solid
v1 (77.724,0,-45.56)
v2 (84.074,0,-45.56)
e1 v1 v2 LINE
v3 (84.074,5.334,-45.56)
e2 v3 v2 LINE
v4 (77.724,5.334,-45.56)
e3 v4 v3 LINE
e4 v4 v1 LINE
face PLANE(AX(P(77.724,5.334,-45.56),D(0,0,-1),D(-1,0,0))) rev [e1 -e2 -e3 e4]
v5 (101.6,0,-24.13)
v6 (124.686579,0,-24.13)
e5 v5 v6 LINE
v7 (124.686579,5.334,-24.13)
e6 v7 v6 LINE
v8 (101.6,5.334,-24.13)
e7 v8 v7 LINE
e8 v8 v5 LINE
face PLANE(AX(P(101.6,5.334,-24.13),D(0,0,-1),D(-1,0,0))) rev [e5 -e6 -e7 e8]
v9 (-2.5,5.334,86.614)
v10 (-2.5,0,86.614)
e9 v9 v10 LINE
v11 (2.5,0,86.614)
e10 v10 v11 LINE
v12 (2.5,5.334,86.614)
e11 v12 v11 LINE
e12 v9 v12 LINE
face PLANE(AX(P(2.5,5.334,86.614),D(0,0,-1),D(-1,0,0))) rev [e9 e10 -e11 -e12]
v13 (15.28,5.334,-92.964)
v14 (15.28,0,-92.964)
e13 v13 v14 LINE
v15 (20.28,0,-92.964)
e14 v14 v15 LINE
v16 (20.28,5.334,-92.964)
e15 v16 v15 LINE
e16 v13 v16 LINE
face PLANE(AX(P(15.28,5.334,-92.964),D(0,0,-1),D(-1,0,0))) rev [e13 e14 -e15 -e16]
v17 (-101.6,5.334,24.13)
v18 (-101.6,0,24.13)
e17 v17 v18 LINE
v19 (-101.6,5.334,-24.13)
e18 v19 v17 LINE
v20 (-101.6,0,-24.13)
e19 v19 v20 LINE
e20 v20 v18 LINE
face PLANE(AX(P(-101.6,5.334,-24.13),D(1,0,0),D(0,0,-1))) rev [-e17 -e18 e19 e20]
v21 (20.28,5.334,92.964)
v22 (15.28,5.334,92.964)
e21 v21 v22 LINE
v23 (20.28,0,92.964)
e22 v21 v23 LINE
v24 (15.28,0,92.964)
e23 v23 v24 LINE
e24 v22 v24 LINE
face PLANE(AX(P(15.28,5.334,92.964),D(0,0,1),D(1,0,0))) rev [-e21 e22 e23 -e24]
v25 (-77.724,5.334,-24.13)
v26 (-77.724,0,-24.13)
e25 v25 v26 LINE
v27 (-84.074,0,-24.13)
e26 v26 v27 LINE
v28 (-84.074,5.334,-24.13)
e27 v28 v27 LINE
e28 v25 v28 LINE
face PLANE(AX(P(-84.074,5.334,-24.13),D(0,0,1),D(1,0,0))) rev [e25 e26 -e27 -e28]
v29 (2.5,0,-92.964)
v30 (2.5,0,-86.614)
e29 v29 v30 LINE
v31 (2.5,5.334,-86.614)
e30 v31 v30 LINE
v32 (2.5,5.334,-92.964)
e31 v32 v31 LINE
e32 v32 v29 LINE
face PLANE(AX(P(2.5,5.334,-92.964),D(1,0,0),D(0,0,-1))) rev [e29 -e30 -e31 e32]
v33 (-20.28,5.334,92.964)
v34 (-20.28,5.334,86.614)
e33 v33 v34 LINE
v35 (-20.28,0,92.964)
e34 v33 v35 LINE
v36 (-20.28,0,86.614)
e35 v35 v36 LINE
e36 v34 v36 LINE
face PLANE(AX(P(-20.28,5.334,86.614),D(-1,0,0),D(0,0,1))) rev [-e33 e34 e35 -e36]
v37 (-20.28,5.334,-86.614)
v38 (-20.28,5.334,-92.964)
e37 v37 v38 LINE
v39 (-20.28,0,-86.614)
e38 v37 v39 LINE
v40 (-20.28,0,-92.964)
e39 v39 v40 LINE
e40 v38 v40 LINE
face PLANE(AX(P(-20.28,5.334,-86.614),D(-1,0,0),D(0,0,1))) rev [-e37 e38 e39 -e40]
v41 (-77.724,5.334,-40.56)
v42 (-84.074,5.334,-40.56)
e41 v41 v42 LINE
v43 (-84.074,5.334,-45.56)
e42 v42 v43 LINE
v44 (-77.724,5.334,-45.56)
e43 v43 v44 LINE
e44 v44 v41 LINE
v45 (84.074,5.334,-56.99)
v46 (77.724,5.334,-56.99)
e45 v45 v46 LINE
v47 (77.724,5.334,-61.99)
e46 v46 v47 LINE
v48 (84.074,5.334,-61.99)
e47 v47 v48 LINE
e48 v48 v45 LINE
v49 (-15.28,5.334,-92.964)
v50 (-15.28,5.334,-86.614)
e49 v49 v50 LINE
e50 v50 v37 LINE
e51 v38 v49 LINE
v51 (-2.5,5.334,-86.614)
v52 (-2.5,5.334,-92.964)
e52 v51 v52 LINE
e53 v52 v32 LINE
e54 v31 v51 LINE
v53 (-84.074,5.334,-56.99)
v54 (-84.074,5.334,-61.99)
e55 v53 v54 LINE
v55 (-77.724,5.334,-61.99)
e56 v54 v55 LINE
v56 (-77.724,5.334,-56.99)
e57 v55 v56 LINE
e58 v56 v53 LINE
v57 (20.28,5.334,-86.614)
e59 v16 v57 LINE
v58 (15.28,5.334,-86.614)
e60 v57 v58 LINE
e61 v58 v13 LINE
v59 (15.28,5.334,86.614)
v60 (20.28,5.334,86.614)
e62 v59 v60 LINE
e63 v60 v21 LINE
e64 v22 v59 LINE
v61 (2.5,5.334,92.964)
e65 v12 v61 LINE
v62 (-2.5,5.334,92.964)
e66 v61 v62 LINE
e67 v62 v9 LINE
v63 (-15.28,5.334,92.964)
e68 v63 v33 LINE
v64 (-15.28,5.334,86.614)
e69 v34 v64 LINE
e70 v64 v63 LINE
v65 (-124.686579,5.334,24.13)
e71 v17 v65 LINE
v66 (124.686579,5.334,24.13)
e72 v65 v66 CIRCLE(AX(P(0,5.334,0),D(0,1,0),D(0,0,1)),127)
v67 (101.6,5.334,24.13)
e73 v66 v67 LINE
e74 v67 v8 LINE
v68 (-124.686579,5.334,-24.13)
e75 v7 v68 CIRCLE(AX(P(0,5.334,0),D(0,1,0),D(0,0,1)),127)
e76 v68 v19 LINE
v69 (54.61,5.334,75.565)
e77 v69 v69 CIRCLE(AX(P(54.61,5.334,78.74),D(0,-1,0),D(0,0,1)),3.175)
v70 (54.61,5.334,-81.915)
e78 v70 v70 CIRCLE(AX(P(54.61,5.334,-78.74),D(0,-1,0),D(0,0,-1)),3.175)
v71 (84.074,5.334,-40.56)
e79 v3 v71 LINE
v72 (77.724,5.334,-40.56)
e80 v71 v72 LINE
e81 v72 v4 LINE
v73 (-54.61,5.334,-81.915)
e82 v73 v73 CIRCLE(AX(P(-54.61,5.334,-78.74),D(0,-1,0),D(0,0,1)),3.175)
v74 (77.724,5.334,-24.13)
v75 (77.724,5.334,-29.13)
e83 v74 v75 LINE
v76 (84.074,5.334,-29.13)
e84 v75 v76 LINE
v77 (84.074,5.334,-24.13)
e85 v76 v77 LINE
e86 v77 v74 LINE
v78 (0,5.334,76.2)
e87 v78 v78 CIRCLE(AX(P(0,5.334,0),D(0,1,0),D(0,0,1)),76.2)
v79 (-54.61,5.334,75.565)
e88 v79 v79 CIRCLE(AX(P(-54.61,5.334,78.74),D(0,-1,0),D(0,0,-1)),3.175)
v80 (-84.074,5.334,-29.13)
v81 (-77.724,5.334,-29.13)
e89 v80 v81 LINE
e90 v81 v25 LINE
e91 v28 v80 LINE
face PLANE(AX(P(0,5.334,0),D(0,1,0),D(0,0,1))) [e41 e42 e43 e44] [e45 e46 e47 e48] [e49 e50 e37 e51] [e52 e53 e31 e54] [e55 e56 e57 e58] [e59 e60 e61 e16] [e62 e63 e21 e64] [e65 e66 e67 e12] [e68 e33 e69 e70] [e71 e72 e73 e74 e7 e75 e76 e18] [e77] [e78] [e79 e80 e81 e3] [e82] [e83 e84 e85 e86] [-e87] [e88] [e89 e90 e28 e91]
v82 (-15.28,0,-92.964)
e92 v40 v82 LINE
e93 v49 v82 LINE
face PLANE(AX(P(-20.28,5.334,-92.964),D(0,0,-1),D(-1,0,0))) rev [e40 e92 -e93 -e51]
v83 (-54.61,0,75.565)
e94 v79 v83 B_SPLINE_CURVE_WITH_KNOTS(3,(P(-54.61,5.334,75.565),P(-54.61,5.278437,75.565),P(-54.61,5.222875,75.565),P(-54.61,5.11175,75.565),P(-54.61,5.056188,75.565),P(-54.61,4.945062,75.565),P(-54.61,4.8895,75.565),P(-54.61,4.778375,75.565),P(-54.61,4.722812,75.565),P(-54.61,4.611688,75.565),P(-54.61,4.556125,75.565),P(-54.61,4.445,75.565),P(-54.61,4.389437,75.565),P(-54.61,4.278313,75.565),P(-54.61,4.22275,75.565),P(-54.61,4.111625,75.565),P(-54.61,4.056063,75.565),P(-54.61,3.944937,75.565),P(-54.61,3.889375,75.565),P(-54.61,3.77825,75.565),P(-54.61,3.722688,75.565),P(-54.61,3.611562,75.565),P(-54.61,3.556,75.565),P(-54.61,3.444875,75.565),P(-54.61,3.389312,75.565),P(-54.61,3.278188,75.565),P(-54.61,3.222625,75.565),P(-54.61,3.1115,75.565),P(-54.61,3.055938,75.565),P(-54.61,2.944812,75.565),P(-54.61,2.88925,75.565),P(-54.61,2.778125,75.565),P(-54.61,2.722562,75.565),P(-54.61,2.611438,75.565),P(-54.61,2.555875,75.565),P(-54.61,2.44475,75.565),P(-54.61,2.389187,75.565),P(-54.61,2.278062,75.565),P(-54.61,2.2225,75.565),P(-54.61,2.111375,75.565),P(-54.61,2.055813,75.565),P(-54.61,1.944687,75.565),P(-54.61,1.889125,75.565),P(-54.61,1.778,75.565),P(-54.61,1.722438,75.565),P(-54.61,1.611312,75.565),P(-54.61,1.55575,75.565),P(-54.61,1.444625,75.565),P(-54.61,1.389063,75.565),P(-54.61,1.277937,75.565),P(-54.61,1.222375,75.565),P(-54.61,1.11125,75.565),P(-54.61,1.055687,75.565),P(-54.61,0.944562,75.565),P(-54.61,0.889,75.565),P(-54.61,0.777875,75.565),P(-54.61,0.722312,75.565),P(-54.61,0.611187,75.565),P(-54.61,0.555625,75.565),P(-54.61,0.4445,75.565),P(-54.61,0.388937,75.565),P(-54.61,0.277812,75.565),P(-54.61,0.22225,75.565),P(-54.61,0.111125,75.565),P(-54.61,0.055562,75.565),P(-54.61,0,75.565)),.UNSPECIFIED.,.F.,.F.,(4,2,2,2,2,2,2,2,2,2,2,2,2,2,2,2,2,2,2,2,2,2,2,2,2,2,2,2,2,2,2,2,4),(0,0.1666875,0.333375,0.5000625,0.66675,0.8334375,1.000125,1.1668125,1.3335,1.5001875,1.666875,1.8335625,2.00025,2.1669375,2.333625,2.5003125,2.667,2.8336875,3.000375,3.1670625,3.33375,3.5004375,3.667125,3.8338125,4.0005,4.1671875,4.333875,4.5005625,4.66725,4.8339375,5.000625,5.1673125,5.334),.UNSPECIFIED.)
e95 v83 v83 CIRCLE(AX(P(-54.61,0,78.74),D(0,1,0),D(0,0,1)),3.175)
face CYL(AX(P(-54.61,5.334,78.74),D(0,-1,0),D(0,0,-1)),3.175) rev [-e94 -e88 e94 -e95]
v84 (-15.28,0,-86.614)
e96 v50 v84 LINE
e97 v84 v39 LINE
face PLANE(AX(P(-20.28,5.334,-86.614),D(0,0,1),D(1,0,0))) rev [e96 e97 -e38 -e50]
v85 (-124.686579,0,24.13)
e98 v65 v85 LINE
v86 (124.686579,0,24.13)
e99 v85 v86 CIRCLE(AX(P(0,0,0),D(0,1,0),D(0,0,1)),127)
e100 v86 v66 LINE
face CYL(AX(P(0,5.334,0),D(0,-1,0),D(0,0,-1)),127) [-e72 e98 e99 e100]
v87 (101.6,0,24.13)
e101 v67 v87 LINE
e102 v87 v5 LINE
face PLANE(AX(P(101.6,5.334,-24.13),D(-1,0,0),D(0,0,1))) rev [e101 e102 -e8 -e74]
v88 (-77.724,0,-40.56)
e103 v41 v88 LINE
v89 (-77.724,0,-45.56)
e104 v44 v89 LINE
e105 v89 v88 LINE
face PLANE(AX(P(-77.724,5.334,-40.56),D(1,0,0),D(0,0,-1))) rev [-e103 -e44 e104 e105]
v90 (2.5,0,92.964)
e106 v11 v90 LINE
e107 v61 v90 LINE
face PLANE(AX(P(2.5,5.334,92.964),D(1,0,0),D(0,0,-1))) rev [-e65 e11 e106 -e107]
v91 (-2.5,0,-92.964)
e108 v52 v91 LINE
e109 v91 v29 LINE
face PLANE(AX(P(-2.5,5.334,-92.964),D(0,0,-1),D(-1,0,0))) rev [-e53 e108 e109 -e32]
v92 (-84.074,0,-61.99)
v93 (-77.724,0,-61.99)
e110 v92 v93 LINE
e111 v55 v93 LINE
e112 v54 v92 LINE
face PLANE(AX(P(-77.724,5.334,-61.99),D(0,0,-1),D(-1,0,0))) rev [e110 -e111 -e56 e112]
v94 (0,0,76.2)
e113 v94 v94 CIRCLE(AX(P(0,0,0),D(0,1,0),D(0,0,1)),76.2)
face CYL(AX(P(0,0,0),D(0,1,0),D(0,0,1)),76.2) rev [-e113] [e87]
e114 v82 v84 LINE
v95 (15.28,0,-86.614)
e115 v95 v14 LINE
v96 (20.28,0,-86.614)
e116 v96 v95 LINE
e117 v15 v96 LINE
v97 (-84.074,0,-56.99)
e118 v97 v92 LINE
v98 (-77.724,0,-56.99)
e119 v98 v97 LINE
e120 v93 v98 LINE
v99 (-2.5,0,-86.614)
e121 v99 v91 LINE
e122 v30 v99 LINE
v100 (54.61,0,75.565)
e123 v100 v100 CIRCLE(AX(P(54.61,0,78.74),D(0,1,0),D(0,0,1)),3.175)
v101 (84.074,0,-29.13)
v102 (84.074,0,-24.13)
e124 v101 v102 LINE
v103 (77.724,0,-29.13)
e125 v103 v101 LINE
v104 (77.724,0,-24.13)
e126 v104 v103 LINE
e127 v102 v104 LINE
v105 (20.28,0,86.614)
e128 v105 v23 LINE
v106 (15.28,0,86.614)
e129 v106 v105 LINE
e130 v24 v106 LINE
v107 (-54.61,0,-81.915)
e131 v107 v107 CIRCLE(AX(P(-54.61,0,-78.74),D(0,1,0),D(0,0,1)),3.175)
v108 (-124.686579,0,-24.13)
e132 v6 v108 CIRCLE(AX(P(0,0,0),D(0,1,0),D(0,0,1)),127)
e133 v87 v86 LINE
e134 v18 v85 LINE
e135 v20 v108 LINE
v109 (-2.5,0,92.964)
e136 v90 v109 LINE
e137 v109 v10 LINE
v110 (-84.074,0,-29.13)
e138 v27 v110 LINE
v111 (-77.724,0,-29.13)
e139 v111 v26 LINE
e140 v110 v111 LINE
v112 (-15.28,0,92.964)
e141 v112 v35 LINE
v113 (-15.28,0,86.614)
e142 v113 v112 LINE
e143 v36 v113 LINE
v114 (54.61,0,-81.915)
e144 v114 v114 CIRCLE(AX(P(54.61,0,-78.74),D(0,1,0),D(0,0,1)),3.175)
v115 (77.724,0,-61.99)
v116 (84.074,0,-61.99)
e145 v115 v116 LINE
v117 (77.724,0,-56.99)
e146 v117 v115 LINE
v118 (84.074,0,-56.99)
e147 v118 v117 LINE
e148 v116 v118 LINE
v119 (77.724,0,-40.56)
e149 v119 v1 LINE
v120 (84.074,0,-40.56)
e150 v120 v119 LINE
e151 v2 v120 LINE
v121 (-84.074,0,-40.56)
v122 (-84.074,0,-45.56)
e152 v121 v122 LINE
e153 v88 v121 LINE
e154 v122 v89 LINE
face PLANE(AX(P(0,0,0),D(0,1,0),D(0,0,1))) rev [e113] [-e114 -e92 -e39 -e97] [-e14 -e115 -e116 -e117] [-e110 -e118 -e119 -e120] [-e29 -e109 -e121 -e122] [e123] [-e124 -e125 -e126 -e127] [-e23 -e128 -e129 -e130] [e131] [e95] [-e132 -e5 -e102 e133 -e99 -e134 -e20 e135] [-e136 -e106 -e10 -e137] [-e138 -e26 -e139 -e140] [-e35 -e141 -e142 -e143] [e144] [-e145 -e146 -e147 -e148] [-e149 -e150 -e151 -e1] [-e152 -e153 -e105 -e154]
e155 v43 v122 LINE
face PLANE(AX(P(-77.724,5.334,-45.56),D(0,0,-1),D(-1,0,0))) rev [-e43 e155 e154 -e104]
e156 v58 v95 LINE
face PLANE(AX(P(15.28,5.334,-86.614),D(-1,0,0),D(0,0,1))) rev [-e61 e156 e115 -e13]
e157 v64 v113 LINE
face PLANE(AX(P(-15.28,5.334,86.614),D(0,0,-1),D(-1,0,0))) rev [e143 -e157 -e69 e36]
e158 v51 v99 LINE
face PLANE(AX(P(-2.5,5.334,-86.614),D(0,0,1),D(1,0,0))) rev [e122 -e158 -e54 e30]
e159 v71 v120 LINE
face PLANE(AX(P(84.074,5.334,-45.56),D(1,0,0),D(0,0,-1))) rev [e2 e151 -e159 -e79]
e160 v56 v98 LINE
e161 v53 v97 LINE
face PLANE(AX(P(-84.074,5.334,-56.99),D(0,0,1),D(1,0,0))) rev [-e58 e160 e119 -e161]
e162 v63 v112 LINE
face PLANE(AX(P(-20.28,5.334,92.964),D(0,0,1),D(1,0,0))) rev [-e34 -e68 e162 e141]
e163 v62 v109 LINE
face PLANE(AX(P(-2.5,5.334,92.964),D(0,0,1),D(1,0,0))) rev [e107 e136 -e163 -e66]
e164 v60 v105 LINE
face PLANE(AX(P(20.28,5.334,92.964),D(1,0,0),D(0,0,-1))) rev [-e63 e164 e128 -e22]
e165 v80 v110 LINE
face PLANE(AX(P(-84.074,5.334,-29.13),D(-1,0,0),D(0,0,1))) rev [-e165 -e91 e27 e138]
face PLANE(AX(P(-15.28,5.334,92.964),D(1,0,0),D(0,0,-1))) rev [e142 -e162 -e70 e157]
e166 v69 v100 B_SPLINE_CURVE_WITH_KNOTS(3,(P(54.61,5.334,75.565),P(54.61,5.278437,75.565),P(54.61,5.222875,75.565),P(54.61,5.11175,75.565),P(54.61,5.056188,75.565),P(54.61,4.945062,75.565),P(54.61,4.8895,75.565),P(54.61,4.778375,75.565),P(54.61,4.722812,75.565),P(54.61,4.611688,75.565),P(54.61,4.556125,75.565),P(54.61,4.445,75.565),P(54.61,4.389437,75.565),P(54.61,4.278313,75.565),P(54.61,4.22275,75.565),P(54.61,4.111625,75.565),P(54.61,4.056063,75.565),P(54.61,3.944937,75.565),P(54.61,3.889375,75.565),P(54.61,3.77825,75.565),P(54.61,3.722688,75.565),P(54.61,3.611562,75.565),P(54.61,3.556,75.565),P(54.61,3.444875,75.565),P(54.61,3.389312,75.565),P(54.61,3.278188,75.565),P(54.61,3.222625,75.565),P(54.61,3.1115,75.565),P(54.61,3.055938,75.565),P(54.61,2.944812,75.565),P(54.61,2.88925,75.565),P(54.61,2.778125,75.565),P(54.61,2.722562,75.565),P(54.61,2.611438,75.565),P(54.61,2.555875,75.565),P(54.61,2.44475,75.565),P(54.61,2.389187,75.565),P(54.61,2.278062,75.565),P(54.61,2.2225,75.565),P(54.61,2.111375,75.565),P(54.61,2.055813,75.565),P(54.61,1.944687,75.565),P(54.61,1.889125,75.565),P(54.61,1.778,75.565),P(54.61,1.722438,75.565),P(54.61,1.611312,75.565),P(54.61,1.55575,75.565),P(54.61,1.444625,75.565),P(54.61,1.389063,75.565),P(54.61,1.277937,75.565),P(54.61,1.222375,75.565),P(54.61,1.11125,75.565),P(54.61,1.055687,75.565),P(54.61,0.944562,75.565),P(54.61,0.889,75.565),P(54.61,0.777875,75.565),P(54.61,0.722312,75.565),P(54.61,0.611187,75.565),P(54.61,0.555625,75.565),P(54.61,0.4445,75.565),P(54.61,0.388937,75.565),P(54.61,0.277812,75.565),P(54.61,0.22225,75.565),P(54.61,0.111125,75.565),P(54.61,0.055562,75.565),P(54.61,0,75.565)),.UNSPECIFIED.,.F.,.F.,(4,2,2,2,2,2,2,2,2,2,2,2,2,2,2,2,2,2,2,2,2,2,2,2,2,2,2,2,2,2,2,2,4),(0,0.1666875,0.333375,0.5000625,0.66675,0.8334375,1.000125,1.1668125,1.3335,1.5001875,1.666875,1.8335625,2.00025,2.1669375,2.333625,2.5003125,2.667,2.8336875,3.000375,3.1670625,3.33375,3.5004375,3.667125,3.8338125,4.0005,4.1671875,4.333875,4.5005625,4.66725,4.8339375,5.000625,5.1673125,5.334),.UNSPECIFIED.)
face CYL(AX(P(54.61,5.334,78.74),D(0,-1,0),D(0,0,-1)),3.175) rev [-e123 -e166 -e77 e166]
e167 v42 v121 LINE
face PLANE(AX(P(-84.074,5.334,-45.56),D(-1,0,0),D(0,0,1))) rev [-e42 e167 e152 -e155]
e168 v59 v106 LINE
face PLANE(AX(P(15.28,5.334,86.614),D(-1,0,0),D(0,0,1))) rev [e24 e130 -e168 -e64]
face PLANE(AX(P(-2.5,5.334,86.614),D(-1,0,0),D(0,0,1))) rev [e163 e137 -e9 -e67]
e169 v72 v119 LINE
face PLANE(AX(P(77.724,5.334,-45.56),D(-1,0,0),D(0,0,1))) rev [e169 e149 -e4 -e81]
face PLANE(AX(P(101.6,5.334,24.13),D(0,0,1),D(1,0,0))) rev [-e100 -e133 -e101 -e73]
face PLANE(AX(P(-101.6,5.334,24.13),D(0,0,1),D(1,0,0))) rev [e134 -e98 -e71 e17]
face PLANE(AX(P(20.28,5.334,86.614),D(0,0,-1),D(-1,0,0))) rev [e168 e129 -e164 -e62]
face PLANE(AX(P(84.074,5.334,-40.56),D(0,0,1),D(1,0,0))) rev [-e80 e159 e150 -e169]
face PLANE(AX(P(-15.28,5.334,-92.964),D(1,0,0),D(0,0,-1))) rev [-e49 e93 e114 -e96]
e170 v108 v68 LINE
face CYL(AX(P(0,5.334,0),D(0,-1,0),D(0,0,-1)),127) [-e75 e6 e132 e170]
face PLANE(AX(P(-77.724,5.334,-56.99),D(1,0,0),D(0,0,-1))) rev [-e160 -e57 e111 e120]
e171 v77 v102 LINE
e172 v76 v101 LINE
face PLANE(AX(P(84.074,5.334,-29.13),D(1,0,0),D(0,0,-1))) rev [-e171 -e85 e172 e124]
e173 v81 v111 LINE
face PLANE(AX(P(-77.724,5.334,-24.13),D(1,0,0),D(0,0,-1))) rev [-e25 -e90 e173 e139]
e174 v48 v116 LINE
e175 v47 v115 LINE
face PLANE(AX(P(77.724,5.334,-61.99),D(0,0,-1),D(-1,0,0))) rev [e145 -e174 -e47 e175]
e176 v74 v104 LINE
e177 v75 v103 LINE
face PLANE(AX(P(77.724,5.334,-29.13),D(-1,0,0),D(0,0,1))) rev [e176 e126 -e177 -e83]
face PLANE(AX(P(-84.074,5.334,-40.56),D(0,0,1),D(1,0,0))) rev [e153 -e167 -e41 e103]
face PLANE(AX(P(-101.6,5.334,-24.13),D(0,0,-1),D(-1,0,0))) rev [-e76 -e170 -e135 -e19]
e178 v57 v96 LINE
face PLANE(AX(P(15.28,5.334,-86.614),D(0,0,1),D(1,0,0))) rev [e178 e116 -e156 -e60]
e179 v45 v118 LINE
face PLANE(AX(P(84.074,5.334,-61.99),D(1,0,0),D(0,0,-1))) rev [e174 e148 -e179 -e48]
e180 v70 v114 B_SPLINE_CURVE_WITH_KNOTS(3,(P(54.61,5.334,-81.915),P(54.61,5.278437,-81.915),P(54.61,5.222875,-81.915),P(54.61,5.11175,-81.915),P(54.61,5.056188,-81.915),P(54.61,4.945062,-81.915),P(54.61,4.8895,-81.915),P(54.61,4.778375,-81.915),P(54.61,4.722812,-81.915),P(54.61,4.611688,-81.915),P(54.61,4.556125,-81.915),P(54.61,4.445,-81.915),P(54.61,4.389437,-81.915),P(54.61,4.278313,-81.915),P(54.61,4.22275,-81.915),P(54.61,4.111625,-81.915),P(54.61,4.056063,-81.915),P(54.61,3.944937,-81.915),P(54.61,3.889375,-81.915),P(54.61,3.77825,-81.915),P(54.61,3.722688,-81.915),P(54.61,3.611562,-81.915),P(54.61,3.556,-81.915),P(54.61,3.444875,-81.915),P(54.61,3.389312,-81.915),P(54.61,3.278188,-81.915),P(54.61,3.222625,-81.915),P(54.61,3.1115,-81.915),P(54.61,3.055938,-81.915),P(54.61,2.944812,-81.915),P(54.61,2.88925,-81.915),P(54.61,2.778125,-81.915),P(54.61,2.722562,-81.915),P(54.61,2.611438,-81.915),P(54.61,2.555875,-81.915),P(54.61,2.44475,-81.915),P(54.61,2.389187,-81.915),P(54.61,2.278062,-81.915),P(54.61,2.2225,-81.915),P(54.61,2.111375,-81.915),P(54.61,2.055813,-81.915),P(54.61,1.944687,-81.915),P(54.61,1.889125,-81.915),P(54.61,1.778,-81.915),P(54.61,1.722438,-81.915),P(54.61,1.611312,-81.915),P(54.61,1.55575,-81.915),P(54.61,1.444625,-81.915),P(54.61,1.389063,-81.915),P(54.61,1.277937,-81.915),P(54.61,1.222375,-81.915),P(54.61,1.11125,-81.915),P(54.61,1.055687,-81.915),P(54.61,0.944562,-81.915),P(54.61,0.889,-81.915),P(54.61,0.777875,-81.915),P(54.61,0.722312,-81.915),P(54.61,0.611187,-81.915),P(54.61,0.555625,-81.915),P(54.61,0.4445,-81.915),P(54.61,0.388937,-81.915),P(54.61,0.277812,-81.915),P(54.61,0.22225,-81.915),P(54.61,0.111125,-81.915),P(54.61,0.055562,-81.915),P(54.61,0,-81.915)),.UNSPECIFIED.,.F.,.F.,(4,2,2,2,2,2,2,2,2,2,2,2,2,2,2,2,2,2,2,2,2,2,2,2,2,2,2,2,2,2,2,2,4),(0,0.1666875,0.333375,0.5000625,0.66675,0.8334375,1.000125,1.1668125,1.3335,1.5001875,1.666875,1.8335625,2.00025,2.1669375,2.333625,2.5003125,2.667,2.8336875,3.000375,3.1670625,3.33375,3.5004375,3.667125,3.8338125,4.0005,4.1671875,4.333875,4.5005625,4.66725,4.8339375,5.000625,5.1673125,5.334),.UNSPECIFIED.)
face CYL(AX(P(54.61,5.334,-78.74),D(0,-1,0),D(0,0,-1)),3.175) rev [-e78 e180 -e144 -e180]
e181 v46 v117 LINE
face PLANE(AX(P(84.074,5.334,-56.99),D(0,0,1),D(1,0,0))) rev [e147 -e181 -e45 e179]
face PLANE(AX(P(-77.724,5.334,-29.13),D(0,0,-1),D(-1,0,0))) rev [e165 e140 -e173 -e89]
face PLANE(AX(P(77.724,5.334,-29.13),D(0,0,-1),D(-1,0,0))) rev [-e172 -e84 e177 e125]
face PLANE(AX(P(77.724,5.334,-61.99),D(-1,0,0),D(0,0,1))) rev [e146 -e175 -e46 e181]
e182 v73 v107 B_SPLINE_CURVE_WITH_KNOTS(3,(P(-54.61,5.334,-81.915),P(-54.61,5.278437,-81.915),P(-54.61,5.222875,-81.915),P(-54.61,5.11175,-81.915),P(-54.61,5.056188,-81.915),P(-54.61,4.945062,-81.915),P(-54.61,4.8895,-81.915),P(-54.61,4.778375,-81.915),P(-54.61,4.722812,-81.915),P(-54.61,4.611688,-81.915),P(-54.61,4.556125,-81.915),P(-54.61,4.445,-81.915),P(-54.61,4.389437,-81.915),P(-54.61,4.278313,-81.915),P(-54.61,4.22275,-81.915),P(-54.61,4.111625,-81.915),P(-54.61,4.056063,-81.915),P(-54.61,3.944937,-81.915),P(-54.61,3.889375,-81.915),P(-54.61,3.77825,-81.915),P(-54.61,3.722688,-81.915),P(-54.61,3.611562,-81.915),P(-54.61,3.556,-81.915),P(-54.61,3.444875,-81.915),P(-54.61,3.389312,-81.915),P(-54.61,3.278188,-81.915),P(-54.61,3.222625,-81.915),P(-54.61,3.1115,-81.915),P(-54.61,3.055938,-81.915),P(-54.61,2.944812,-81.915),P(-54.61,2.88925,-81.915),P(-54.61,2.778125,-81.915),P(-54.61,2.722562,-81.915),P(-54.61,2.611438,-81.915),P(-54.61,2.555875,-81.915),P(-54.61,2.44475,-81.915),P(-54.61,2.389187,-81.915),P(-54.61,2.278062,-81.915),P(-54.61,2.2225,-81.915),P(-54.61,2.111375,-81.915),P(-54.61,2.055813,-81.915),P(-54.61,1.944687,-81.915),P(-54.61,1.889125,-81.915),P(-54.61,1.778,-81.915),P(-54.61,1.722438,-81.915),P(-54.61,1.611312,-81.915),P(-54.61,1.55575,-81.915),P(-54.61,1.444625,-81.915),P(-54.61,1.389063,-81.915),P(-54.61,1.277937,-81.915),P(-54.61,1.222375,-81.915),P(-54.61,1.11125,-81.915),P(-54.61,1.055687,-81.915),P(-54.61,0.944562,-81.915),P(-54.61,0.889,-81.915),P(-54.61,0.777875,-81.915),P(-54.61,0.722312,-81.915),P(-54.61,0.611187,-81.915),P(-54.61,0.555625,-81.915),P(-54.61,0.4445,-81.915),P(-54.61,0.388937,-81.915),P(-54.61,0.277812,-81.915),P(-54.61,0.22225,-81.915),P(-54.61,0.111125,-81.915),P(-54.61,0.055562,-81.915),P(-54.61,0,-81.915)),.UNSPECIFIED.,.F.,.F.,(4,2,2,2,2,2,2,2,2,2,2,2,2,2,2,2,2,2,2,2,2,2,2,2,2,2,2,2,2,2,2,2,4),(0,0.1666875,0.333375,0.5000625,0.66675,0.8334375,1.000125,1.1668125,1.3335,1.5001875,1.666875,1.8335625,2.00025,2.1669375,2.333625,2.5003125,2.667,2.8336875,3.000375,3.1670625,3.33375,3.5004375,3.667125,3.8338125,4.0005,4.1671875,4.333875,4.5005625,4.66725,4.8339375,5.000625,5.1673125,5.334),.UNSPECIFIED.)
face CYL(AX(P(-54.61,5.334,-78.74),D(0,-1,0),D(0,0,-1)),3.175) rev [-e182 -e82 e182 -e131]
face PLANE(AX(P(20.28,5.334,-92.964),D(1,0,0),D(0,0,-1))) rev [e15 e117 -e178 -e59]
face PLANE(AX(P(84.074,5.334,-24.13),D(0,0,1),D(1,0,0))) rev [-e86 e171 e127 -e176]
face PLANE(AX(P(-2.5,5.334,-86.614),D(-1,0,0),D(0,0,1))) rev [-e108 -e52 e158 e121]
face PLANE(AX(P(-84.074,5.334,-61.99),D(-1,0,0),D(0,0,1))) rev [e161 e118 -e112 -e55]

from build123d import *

# Parameters (mm, degrees)
SKETCH1_R          = 127
BASE_DEPTH         = 5.334
SKETCH2_R          = 76.2
CENTER_CUT_DEPTH   = 180.684310823
SKETCH14_W         = 5
SKETCH14_H         = 6.35
SKETCH14_W_2       = 6.35
SKETCH14_H_2       = 5
CUT_EXTRUDE1_DEPTH = 180.684310823
SKETCH15_W         = 30.48
SKETCH15_H         = 48.26
CUT_EXTRUDE2_DEPTH = 180.684310823
HOLE1_OUTLINE_R    = 3.175
HOLE1_DEPTH        = 5.334


# Read off the part's stored shape, not the designer's step: Hole1
with BuildPart() as part:
    # Sketch1 → Base (new body)
    with BuildSketch(Plane(origin=(0, 0, 0), x_dir=(1, 0, 0), z_dir=(0, 1, 0))):
        with Locations(Location((0, 0, 0), (0, 0, 270))):
            Circle(SKETCH1_R)
    extrude(amount=BASE_DEPTH)

    # Sketch2 → Center Cut (cut, through all)
    with BuildSketch(Plane(origin=(0, 5.334, 0), x_dir=(1, 0, 0), z_dir=(0, 1, 0))):
        with Locations(Location((0, 0, 0), (0, 0, 270))):
            Circle(SKETCH2_R)
    extrude(amount=-CENTER_CUT_DEPTH, mode=Mode.SUBTRACT)

    # Sketch14 → Cut-Extrude1 (cut, through all)
    with BuildSketch(Plane.XZ):
        with Locations((0, 89.789)):
            Rectangle(SKETCH14_W, SKETCH14_H)
        with Locations((-17.78, 89.789)):
            Rectangle(SKETCH14_W, SKETCH14_H)
        with Locations((17.78, 89.789)):
            Rectangle(SKETCH14_W, SKETCH14_H)
        with Locations((-80.899, -26.63)):
            Rectangle(SKETCH14_W_2, SKETCH14_H_2)
        with Locations((-80.899, -43.06)):
            Rectangle(SKETCH14_W_2, SKETCH14_H_2)
        with Locations((-80.899, -59.49)):
            Rectangle(SKETCH14_W_2, SKETCH14_H_2)
        with Locations((80.899, -26.63)):
            Rectangle(SKETCH14_W_2, SKETCH14_H_2)
        with Locations((80.899, -43.06)):
            Rectangle(SKETCH14_W_2, SKETCH14_H_2)
        with Locations((80.899, -59.49)):
            Rectangle(SKETCH14_W_2, SKETCH14_H_2)
        with Locations((17.78, -89.789)):
            Rectangle(SKETCH14_W, SKETCH14_H)
        with Locations((0, -89.789)):
            Rectangle(SKETCH14_W, SKETCH14_H)
        with Locations((-17.78, -89.789)):
            Rectangle(SKETCH14_W, SKETCH14_H)
    extrude(amount=-CUT_EXTRUDE1_DEPTH, mode=Mode.SUBTRACT)

    # Sketch15 → Cut-Extrude2 (cut, through all)
    with BuildSketch(Plane.XZ):
        with Locations((-116.84, 0)):
            Rectangle(SKETCH15_W, SKETCH15_H)
        with Locations((116.84, 0)):
            Rectangle(SKETCH15_W, SKETCH15_H)
    extrude(amount=-CUT_EXTRUDE2_DEPTH, mode=Mode.SUBTRACT)

    # Hole1 outline → Hole1 (cut)
    with BuildSketch(Plane(origin=(0, 0, 0), x_dir=(1, 0, 0), z_dir=(0, 1, 0))):
        with Locations((-54.61, -78.74)):
            Circle(HOLE1_OUTLINE_R)
        with Locations((54.61, -78.74)):
            Circle(HOLE1_OUTLINE_R)
        with Locations((54.61, 78.74)):
            Circle(HOLE1_OUTLINE_R)
        with Locations((-54.61, 78.74)):
            Circle(HOLE1_OUTLINE_R)
    extrude(amount=HOLE1_DEPTH, mode=Mode.SUBTRACT)


solid = part.part
